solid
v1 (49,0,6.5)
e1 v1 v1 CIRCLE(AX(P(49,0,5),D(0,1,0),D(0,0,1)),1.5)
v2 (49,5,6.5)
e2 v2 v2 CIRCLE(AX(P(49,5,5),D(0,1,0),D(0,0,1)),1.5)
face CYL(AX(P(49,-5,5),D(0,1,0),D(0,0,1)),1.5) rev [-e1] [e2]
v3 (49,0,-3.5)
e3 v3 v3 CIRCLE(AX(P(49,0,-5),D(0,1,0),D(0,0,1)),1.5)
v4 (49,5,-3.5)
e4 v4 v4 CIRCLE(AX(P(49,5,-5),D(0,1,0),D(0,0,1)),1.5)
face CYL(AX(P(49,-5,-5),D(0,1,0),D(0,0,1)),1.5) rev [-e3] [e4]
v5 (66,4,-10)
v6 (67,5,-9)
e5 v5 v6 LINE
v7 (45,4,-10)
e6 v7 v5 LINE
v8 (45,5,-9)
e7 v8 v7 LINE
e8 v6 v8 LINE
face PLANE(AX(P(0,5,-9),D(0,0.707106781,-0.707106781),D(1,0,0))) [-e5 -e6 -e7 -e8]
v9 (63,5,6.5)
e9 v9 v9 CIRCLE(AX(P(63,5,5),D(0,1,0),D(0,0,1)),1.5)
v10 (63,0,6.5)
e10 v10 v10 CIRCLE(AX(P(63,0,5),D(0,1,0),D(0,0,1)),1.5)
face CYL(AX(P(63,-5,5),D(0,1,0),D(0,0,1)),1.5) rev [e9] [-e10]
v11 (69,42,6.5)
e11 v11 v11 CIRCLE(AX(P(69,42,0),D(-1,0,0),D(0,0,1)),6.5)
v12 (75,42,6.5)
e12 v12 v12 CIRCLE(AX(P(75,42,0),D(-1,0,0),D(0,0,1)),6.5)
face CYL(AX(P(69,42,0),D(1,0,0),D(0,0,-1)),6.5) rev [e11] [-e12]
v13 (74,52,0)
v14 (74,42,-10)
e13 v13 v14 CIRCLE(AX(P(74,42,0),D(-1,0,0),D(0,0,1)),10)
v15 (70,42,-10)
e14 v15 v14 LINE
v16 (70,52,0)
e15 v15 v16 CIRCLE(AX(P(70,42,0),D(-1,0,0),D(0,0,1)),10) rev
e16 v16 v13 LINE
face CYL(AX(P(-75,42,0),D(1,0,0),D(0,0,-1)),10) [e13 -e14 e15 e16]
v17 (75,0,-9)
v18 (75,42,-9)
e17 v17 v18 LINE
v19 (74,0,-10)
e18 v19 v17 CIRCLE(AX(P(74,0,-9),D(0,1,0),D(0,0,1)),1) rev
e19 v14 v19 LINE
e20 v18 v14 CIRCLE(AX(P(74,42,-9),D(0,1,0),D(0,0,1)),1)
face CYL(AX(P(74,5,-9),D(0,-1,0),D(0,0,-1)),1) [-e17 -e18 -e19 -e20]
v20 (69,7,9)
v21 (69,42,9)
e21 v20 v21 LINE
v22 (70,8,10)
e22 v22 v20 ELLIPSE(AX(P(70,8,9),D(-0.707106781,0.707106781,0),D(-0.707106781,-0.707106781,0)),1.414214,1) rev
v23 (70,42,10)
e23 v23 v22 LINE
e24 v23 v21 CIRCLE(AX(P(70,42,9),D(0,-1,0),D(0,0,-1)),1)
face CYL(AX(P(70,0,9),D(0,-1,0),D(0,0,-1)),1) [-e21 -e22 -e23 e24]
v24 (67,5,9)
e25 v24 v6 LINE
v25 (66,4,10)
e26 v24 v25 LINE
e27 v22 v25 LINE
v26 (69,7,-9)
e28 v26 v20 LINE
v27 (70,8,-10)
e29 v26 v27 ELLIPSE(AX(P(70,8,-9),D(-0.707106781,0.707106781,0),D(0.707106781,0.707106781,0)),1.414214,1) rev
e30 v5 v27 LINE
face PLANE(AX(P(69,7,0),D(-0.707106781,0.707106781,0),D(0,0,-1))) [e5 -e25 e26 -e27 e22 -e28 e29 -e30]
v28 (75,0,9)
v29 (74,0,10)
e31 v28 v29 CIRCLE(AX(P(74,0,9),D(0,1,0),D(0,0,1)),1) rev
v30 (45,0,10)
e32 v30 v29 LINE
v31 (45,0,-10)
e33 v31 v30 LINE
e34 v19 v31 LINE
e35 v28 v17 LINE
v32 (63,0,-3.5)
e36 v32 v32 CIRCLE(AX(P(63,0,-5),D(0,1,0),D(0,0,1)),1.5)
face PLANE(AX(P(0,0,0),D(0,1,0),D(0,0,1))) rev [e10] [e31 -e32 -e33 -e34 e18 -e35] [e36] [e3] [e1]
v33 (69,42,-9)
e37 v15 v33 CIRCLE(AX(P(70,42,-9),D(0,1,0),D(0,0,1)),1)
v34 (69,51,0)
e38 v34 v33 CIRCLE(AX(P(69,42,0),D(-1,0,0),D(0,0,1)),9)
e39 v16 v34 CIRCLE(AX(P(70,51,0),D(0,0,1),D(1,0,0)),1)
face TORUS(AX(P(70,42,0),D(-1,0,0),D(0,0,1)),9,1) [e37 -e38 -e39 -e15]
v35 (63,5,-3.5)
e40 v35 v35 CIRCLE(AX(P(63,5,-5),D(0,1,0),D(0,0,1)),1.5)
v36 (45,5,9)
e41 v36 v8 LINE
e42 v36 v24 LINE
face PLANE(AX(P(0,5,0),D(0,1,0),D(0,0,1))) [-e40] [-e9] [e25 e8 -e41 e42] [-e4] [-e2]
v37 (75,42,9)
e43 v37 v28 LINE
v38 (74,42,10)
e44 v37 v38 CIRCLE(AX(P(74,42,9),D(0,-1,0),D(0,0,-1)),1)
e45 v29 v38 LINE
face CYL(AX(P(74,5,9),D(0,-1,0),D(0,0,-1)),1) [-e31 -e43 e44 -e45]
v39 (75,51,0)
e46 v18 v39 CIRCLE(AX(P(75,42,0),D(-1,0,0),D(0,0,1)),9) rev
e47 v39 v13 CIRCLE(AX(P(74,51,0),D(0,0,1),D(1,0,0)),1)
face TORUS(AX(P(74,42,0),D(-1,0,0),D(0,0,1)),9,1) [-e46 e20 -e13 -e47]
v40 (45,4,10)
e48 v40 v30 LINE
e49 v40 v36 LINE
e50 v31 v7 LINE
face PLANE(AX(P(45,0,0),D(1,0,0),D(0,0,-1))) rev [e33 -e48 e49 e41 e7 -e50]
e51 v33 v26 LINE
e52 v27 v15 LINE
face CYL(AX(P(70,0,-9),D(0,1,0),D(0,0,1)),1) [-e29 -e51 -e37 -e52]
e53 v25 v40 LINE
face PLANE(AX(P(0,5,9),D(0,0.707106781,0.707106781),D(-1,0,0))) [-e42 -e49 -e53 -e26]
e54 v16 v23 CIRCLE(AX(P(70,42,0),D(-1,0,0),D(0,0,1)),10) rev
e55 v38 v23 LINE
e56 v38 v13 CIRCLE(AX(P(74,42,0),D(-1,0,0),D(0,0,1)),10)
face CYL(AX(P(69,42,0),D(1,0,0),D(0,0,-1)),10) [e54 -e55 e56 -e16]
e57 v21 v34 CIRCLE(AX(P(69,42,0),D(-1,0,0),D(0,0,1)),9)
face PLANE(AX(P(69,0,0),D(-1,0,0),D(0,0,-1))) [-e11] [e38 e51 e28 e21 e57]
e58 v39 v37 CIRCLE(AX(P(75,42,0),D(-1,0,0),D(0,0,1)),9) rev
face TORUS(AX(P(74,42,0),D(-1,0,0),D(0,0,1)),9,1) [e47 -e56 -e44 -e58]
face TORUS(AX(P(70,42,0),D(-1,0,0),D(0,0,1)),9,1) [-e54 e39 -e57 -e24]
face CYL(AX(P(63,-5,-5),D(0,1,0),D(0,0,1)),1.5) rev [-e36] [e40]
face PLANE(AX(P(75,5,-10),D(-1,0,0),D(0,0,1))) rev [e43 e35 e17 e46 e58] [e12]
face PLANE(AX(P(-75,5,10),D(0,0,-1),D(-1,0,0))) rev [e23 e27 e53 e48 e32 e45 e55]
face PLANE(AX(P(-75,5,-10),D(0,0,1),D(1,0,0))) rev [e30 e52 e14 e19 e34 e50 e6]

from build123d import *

# Parameters (mm, degrees)
SKETCH1_W            = 150
SKETCH1_H            = 20
BOSS_EXTRUDE1_DEPTH  = 5
SKETCH2_W            = 20
SKETCH2_H            = 47
SKETCH2_R            = 6.5
BOSS_EXTRUDE2_DEPTH  = 6
FILLET1_R            = 10
FILLET1_OF_MIRROR1_R = 10
CHAMFER1_SIZE        = 2
FILLET2_R            = 1
CHAMFER2_SIZE        = 1
SKETCH3_W            = 35.580310247
SKETCH3_H            = 66.117820845
CUT_EXTRUDE1_DEPTH   = 120
SKETCH4_R            = 1.5
CUT_EXTRUDE2_DEPTH   = 10


with BuildPart() as part:
    # Sketch1 → Boss-Extrude1 (new body)
    with BuildSketch(Plane(origin=(0, 0, 0), x_dir=(1, 0, 0), z_dir=(0, 1, 0))):
        Rectangle(SKETCH1_W, SKETCH1_H)
    extrude(amount=BOSS_EXTRUDE1_DEPTH)

    # Sketch2 → Boss-Extrude2 (add)
    with BuildSketch(Plane.ZY.offset(75)):
        with Locations((0, 28.5)):
            Rectangle(SKETCH2_W, SKETCH2_H)
        with Locations((0, 42)):
            Circle(SKETCH2_R, mode=Mode.SUBTRACT)
    boss_extrude2 = extrude(amount=-BOSS_EXTRUDE2_DEPTH)

    # Fillet1
    fillet1_edges = [part.edges().sort_by_distance(p)[0] for p in [
        (-72, 52, -10),
        (-72, 52, 10),
    ]]
    fillet(fillet1_edges, radius=FILLET1_R - 0.0001)  # a hair under: the kernel refuses the full size

    # Mirror1: Boss-Extrude2 across plane
    add(boss_extrude2.mirror(Plane(origin=(0, 0, 0), x_dir=(0, 0, 1), z_dir=(1, 0, 0))))

    # Fillet1 of Mirror1
    fillet1_of_mirror1_edges = [part.edges().sort_by_distance(p)[0] for p in [
        (72, 52, -10),
        (72, 52, 10),
    ]]
    fillet(fillet1_of_mirror1_edges, radius=FILLET1_OF_MIRROR1_R - 0.0001)  # a hair under: the kernel refuses the full size

    # Chamfer1
    chamfer1_edges = [part.edges().sort_by_distance(p)[0] for p in [
        (-69, 5, 0),
        (69, 5, 0),
    ]]
    chamfer(chamfer1_edges, length=CHAMFER1_SIZE)

    # Fillet2
    fillet2_edges = [part.edges().sort_by_distance(p)[0] for p in [
        (-75, 21.00005, 10),
        (-75, 21.00005, -10),
        (-75, 49.071097101, 7.071097101),
        (-75, 49.071097101, -7.071097101),
        (-69, 24.50005, -10),
        (-69, 49.071097101, 7.071097101),
        (-69, 49.071097101, -7.071097101),
        (69, 24.50005, -10),
        (75, 21.00005, -10),
        (75, 21.00005, 10),
        (75, 49.071097101, 7.071097101),
        (75, 49.071097101, -7.071097101),
        (69, 49.071097101, 7.071097101),
        (69, 49.071097101, -7.071097101),
        (-69, 24.50005, 10),
        (69, 24.50005, 10),
    ]]
    fillet(fillet2_edges, radius=FILLET2_R)

    # Chamfer2
    chamfer2_edges = [part.edges().sort_by_distance(p)[0] for p in [
        (0, 5, -10),
        (0, 5, 10),
    ]]
    chamfer(chamfer2_edges, length=CHAMFER2_SIZE)

    # Sketch3 → Cut-Extrude1 (cut)
    with BuildSketch(Plane.ZY.offset(75)):
        with Locations((0.077756878, 33.058910422)):
            Rectangle(SKETCH3_W, SKETCH3_H)
    extrude(amount=-CUT_EXTRUDE1_DEPTH, mode=Mode.SUBTRACT)

    # Sketch4 → Cut-Extrude2 (cut)
    with BuildSketch(Plane(origin=(0, 5, 0), x_dir=(1, 0, 0), z_dir=(0, 1, 0))):
        with Locations(Location((49, 5, 0), (0, 0, 270))):
            Circle(SKETCH4_R)
        with Locations(Location((49, -5, 0), (0, 0, 270))):
            Circle(SKETCH4_R)
        with Locations(Location((63, -5, 0), (0, 0, 270))):
            Circle(SKETCH4_R)
        with Locations(Location((63, 5, 0), (0, 0, 270))):
            Circle(SKETCH4_R)
    extrude(amount=-CUT_EXTRUDE2_DEPTH, mode=Mode.SUBTRACT)


solid = part.part
